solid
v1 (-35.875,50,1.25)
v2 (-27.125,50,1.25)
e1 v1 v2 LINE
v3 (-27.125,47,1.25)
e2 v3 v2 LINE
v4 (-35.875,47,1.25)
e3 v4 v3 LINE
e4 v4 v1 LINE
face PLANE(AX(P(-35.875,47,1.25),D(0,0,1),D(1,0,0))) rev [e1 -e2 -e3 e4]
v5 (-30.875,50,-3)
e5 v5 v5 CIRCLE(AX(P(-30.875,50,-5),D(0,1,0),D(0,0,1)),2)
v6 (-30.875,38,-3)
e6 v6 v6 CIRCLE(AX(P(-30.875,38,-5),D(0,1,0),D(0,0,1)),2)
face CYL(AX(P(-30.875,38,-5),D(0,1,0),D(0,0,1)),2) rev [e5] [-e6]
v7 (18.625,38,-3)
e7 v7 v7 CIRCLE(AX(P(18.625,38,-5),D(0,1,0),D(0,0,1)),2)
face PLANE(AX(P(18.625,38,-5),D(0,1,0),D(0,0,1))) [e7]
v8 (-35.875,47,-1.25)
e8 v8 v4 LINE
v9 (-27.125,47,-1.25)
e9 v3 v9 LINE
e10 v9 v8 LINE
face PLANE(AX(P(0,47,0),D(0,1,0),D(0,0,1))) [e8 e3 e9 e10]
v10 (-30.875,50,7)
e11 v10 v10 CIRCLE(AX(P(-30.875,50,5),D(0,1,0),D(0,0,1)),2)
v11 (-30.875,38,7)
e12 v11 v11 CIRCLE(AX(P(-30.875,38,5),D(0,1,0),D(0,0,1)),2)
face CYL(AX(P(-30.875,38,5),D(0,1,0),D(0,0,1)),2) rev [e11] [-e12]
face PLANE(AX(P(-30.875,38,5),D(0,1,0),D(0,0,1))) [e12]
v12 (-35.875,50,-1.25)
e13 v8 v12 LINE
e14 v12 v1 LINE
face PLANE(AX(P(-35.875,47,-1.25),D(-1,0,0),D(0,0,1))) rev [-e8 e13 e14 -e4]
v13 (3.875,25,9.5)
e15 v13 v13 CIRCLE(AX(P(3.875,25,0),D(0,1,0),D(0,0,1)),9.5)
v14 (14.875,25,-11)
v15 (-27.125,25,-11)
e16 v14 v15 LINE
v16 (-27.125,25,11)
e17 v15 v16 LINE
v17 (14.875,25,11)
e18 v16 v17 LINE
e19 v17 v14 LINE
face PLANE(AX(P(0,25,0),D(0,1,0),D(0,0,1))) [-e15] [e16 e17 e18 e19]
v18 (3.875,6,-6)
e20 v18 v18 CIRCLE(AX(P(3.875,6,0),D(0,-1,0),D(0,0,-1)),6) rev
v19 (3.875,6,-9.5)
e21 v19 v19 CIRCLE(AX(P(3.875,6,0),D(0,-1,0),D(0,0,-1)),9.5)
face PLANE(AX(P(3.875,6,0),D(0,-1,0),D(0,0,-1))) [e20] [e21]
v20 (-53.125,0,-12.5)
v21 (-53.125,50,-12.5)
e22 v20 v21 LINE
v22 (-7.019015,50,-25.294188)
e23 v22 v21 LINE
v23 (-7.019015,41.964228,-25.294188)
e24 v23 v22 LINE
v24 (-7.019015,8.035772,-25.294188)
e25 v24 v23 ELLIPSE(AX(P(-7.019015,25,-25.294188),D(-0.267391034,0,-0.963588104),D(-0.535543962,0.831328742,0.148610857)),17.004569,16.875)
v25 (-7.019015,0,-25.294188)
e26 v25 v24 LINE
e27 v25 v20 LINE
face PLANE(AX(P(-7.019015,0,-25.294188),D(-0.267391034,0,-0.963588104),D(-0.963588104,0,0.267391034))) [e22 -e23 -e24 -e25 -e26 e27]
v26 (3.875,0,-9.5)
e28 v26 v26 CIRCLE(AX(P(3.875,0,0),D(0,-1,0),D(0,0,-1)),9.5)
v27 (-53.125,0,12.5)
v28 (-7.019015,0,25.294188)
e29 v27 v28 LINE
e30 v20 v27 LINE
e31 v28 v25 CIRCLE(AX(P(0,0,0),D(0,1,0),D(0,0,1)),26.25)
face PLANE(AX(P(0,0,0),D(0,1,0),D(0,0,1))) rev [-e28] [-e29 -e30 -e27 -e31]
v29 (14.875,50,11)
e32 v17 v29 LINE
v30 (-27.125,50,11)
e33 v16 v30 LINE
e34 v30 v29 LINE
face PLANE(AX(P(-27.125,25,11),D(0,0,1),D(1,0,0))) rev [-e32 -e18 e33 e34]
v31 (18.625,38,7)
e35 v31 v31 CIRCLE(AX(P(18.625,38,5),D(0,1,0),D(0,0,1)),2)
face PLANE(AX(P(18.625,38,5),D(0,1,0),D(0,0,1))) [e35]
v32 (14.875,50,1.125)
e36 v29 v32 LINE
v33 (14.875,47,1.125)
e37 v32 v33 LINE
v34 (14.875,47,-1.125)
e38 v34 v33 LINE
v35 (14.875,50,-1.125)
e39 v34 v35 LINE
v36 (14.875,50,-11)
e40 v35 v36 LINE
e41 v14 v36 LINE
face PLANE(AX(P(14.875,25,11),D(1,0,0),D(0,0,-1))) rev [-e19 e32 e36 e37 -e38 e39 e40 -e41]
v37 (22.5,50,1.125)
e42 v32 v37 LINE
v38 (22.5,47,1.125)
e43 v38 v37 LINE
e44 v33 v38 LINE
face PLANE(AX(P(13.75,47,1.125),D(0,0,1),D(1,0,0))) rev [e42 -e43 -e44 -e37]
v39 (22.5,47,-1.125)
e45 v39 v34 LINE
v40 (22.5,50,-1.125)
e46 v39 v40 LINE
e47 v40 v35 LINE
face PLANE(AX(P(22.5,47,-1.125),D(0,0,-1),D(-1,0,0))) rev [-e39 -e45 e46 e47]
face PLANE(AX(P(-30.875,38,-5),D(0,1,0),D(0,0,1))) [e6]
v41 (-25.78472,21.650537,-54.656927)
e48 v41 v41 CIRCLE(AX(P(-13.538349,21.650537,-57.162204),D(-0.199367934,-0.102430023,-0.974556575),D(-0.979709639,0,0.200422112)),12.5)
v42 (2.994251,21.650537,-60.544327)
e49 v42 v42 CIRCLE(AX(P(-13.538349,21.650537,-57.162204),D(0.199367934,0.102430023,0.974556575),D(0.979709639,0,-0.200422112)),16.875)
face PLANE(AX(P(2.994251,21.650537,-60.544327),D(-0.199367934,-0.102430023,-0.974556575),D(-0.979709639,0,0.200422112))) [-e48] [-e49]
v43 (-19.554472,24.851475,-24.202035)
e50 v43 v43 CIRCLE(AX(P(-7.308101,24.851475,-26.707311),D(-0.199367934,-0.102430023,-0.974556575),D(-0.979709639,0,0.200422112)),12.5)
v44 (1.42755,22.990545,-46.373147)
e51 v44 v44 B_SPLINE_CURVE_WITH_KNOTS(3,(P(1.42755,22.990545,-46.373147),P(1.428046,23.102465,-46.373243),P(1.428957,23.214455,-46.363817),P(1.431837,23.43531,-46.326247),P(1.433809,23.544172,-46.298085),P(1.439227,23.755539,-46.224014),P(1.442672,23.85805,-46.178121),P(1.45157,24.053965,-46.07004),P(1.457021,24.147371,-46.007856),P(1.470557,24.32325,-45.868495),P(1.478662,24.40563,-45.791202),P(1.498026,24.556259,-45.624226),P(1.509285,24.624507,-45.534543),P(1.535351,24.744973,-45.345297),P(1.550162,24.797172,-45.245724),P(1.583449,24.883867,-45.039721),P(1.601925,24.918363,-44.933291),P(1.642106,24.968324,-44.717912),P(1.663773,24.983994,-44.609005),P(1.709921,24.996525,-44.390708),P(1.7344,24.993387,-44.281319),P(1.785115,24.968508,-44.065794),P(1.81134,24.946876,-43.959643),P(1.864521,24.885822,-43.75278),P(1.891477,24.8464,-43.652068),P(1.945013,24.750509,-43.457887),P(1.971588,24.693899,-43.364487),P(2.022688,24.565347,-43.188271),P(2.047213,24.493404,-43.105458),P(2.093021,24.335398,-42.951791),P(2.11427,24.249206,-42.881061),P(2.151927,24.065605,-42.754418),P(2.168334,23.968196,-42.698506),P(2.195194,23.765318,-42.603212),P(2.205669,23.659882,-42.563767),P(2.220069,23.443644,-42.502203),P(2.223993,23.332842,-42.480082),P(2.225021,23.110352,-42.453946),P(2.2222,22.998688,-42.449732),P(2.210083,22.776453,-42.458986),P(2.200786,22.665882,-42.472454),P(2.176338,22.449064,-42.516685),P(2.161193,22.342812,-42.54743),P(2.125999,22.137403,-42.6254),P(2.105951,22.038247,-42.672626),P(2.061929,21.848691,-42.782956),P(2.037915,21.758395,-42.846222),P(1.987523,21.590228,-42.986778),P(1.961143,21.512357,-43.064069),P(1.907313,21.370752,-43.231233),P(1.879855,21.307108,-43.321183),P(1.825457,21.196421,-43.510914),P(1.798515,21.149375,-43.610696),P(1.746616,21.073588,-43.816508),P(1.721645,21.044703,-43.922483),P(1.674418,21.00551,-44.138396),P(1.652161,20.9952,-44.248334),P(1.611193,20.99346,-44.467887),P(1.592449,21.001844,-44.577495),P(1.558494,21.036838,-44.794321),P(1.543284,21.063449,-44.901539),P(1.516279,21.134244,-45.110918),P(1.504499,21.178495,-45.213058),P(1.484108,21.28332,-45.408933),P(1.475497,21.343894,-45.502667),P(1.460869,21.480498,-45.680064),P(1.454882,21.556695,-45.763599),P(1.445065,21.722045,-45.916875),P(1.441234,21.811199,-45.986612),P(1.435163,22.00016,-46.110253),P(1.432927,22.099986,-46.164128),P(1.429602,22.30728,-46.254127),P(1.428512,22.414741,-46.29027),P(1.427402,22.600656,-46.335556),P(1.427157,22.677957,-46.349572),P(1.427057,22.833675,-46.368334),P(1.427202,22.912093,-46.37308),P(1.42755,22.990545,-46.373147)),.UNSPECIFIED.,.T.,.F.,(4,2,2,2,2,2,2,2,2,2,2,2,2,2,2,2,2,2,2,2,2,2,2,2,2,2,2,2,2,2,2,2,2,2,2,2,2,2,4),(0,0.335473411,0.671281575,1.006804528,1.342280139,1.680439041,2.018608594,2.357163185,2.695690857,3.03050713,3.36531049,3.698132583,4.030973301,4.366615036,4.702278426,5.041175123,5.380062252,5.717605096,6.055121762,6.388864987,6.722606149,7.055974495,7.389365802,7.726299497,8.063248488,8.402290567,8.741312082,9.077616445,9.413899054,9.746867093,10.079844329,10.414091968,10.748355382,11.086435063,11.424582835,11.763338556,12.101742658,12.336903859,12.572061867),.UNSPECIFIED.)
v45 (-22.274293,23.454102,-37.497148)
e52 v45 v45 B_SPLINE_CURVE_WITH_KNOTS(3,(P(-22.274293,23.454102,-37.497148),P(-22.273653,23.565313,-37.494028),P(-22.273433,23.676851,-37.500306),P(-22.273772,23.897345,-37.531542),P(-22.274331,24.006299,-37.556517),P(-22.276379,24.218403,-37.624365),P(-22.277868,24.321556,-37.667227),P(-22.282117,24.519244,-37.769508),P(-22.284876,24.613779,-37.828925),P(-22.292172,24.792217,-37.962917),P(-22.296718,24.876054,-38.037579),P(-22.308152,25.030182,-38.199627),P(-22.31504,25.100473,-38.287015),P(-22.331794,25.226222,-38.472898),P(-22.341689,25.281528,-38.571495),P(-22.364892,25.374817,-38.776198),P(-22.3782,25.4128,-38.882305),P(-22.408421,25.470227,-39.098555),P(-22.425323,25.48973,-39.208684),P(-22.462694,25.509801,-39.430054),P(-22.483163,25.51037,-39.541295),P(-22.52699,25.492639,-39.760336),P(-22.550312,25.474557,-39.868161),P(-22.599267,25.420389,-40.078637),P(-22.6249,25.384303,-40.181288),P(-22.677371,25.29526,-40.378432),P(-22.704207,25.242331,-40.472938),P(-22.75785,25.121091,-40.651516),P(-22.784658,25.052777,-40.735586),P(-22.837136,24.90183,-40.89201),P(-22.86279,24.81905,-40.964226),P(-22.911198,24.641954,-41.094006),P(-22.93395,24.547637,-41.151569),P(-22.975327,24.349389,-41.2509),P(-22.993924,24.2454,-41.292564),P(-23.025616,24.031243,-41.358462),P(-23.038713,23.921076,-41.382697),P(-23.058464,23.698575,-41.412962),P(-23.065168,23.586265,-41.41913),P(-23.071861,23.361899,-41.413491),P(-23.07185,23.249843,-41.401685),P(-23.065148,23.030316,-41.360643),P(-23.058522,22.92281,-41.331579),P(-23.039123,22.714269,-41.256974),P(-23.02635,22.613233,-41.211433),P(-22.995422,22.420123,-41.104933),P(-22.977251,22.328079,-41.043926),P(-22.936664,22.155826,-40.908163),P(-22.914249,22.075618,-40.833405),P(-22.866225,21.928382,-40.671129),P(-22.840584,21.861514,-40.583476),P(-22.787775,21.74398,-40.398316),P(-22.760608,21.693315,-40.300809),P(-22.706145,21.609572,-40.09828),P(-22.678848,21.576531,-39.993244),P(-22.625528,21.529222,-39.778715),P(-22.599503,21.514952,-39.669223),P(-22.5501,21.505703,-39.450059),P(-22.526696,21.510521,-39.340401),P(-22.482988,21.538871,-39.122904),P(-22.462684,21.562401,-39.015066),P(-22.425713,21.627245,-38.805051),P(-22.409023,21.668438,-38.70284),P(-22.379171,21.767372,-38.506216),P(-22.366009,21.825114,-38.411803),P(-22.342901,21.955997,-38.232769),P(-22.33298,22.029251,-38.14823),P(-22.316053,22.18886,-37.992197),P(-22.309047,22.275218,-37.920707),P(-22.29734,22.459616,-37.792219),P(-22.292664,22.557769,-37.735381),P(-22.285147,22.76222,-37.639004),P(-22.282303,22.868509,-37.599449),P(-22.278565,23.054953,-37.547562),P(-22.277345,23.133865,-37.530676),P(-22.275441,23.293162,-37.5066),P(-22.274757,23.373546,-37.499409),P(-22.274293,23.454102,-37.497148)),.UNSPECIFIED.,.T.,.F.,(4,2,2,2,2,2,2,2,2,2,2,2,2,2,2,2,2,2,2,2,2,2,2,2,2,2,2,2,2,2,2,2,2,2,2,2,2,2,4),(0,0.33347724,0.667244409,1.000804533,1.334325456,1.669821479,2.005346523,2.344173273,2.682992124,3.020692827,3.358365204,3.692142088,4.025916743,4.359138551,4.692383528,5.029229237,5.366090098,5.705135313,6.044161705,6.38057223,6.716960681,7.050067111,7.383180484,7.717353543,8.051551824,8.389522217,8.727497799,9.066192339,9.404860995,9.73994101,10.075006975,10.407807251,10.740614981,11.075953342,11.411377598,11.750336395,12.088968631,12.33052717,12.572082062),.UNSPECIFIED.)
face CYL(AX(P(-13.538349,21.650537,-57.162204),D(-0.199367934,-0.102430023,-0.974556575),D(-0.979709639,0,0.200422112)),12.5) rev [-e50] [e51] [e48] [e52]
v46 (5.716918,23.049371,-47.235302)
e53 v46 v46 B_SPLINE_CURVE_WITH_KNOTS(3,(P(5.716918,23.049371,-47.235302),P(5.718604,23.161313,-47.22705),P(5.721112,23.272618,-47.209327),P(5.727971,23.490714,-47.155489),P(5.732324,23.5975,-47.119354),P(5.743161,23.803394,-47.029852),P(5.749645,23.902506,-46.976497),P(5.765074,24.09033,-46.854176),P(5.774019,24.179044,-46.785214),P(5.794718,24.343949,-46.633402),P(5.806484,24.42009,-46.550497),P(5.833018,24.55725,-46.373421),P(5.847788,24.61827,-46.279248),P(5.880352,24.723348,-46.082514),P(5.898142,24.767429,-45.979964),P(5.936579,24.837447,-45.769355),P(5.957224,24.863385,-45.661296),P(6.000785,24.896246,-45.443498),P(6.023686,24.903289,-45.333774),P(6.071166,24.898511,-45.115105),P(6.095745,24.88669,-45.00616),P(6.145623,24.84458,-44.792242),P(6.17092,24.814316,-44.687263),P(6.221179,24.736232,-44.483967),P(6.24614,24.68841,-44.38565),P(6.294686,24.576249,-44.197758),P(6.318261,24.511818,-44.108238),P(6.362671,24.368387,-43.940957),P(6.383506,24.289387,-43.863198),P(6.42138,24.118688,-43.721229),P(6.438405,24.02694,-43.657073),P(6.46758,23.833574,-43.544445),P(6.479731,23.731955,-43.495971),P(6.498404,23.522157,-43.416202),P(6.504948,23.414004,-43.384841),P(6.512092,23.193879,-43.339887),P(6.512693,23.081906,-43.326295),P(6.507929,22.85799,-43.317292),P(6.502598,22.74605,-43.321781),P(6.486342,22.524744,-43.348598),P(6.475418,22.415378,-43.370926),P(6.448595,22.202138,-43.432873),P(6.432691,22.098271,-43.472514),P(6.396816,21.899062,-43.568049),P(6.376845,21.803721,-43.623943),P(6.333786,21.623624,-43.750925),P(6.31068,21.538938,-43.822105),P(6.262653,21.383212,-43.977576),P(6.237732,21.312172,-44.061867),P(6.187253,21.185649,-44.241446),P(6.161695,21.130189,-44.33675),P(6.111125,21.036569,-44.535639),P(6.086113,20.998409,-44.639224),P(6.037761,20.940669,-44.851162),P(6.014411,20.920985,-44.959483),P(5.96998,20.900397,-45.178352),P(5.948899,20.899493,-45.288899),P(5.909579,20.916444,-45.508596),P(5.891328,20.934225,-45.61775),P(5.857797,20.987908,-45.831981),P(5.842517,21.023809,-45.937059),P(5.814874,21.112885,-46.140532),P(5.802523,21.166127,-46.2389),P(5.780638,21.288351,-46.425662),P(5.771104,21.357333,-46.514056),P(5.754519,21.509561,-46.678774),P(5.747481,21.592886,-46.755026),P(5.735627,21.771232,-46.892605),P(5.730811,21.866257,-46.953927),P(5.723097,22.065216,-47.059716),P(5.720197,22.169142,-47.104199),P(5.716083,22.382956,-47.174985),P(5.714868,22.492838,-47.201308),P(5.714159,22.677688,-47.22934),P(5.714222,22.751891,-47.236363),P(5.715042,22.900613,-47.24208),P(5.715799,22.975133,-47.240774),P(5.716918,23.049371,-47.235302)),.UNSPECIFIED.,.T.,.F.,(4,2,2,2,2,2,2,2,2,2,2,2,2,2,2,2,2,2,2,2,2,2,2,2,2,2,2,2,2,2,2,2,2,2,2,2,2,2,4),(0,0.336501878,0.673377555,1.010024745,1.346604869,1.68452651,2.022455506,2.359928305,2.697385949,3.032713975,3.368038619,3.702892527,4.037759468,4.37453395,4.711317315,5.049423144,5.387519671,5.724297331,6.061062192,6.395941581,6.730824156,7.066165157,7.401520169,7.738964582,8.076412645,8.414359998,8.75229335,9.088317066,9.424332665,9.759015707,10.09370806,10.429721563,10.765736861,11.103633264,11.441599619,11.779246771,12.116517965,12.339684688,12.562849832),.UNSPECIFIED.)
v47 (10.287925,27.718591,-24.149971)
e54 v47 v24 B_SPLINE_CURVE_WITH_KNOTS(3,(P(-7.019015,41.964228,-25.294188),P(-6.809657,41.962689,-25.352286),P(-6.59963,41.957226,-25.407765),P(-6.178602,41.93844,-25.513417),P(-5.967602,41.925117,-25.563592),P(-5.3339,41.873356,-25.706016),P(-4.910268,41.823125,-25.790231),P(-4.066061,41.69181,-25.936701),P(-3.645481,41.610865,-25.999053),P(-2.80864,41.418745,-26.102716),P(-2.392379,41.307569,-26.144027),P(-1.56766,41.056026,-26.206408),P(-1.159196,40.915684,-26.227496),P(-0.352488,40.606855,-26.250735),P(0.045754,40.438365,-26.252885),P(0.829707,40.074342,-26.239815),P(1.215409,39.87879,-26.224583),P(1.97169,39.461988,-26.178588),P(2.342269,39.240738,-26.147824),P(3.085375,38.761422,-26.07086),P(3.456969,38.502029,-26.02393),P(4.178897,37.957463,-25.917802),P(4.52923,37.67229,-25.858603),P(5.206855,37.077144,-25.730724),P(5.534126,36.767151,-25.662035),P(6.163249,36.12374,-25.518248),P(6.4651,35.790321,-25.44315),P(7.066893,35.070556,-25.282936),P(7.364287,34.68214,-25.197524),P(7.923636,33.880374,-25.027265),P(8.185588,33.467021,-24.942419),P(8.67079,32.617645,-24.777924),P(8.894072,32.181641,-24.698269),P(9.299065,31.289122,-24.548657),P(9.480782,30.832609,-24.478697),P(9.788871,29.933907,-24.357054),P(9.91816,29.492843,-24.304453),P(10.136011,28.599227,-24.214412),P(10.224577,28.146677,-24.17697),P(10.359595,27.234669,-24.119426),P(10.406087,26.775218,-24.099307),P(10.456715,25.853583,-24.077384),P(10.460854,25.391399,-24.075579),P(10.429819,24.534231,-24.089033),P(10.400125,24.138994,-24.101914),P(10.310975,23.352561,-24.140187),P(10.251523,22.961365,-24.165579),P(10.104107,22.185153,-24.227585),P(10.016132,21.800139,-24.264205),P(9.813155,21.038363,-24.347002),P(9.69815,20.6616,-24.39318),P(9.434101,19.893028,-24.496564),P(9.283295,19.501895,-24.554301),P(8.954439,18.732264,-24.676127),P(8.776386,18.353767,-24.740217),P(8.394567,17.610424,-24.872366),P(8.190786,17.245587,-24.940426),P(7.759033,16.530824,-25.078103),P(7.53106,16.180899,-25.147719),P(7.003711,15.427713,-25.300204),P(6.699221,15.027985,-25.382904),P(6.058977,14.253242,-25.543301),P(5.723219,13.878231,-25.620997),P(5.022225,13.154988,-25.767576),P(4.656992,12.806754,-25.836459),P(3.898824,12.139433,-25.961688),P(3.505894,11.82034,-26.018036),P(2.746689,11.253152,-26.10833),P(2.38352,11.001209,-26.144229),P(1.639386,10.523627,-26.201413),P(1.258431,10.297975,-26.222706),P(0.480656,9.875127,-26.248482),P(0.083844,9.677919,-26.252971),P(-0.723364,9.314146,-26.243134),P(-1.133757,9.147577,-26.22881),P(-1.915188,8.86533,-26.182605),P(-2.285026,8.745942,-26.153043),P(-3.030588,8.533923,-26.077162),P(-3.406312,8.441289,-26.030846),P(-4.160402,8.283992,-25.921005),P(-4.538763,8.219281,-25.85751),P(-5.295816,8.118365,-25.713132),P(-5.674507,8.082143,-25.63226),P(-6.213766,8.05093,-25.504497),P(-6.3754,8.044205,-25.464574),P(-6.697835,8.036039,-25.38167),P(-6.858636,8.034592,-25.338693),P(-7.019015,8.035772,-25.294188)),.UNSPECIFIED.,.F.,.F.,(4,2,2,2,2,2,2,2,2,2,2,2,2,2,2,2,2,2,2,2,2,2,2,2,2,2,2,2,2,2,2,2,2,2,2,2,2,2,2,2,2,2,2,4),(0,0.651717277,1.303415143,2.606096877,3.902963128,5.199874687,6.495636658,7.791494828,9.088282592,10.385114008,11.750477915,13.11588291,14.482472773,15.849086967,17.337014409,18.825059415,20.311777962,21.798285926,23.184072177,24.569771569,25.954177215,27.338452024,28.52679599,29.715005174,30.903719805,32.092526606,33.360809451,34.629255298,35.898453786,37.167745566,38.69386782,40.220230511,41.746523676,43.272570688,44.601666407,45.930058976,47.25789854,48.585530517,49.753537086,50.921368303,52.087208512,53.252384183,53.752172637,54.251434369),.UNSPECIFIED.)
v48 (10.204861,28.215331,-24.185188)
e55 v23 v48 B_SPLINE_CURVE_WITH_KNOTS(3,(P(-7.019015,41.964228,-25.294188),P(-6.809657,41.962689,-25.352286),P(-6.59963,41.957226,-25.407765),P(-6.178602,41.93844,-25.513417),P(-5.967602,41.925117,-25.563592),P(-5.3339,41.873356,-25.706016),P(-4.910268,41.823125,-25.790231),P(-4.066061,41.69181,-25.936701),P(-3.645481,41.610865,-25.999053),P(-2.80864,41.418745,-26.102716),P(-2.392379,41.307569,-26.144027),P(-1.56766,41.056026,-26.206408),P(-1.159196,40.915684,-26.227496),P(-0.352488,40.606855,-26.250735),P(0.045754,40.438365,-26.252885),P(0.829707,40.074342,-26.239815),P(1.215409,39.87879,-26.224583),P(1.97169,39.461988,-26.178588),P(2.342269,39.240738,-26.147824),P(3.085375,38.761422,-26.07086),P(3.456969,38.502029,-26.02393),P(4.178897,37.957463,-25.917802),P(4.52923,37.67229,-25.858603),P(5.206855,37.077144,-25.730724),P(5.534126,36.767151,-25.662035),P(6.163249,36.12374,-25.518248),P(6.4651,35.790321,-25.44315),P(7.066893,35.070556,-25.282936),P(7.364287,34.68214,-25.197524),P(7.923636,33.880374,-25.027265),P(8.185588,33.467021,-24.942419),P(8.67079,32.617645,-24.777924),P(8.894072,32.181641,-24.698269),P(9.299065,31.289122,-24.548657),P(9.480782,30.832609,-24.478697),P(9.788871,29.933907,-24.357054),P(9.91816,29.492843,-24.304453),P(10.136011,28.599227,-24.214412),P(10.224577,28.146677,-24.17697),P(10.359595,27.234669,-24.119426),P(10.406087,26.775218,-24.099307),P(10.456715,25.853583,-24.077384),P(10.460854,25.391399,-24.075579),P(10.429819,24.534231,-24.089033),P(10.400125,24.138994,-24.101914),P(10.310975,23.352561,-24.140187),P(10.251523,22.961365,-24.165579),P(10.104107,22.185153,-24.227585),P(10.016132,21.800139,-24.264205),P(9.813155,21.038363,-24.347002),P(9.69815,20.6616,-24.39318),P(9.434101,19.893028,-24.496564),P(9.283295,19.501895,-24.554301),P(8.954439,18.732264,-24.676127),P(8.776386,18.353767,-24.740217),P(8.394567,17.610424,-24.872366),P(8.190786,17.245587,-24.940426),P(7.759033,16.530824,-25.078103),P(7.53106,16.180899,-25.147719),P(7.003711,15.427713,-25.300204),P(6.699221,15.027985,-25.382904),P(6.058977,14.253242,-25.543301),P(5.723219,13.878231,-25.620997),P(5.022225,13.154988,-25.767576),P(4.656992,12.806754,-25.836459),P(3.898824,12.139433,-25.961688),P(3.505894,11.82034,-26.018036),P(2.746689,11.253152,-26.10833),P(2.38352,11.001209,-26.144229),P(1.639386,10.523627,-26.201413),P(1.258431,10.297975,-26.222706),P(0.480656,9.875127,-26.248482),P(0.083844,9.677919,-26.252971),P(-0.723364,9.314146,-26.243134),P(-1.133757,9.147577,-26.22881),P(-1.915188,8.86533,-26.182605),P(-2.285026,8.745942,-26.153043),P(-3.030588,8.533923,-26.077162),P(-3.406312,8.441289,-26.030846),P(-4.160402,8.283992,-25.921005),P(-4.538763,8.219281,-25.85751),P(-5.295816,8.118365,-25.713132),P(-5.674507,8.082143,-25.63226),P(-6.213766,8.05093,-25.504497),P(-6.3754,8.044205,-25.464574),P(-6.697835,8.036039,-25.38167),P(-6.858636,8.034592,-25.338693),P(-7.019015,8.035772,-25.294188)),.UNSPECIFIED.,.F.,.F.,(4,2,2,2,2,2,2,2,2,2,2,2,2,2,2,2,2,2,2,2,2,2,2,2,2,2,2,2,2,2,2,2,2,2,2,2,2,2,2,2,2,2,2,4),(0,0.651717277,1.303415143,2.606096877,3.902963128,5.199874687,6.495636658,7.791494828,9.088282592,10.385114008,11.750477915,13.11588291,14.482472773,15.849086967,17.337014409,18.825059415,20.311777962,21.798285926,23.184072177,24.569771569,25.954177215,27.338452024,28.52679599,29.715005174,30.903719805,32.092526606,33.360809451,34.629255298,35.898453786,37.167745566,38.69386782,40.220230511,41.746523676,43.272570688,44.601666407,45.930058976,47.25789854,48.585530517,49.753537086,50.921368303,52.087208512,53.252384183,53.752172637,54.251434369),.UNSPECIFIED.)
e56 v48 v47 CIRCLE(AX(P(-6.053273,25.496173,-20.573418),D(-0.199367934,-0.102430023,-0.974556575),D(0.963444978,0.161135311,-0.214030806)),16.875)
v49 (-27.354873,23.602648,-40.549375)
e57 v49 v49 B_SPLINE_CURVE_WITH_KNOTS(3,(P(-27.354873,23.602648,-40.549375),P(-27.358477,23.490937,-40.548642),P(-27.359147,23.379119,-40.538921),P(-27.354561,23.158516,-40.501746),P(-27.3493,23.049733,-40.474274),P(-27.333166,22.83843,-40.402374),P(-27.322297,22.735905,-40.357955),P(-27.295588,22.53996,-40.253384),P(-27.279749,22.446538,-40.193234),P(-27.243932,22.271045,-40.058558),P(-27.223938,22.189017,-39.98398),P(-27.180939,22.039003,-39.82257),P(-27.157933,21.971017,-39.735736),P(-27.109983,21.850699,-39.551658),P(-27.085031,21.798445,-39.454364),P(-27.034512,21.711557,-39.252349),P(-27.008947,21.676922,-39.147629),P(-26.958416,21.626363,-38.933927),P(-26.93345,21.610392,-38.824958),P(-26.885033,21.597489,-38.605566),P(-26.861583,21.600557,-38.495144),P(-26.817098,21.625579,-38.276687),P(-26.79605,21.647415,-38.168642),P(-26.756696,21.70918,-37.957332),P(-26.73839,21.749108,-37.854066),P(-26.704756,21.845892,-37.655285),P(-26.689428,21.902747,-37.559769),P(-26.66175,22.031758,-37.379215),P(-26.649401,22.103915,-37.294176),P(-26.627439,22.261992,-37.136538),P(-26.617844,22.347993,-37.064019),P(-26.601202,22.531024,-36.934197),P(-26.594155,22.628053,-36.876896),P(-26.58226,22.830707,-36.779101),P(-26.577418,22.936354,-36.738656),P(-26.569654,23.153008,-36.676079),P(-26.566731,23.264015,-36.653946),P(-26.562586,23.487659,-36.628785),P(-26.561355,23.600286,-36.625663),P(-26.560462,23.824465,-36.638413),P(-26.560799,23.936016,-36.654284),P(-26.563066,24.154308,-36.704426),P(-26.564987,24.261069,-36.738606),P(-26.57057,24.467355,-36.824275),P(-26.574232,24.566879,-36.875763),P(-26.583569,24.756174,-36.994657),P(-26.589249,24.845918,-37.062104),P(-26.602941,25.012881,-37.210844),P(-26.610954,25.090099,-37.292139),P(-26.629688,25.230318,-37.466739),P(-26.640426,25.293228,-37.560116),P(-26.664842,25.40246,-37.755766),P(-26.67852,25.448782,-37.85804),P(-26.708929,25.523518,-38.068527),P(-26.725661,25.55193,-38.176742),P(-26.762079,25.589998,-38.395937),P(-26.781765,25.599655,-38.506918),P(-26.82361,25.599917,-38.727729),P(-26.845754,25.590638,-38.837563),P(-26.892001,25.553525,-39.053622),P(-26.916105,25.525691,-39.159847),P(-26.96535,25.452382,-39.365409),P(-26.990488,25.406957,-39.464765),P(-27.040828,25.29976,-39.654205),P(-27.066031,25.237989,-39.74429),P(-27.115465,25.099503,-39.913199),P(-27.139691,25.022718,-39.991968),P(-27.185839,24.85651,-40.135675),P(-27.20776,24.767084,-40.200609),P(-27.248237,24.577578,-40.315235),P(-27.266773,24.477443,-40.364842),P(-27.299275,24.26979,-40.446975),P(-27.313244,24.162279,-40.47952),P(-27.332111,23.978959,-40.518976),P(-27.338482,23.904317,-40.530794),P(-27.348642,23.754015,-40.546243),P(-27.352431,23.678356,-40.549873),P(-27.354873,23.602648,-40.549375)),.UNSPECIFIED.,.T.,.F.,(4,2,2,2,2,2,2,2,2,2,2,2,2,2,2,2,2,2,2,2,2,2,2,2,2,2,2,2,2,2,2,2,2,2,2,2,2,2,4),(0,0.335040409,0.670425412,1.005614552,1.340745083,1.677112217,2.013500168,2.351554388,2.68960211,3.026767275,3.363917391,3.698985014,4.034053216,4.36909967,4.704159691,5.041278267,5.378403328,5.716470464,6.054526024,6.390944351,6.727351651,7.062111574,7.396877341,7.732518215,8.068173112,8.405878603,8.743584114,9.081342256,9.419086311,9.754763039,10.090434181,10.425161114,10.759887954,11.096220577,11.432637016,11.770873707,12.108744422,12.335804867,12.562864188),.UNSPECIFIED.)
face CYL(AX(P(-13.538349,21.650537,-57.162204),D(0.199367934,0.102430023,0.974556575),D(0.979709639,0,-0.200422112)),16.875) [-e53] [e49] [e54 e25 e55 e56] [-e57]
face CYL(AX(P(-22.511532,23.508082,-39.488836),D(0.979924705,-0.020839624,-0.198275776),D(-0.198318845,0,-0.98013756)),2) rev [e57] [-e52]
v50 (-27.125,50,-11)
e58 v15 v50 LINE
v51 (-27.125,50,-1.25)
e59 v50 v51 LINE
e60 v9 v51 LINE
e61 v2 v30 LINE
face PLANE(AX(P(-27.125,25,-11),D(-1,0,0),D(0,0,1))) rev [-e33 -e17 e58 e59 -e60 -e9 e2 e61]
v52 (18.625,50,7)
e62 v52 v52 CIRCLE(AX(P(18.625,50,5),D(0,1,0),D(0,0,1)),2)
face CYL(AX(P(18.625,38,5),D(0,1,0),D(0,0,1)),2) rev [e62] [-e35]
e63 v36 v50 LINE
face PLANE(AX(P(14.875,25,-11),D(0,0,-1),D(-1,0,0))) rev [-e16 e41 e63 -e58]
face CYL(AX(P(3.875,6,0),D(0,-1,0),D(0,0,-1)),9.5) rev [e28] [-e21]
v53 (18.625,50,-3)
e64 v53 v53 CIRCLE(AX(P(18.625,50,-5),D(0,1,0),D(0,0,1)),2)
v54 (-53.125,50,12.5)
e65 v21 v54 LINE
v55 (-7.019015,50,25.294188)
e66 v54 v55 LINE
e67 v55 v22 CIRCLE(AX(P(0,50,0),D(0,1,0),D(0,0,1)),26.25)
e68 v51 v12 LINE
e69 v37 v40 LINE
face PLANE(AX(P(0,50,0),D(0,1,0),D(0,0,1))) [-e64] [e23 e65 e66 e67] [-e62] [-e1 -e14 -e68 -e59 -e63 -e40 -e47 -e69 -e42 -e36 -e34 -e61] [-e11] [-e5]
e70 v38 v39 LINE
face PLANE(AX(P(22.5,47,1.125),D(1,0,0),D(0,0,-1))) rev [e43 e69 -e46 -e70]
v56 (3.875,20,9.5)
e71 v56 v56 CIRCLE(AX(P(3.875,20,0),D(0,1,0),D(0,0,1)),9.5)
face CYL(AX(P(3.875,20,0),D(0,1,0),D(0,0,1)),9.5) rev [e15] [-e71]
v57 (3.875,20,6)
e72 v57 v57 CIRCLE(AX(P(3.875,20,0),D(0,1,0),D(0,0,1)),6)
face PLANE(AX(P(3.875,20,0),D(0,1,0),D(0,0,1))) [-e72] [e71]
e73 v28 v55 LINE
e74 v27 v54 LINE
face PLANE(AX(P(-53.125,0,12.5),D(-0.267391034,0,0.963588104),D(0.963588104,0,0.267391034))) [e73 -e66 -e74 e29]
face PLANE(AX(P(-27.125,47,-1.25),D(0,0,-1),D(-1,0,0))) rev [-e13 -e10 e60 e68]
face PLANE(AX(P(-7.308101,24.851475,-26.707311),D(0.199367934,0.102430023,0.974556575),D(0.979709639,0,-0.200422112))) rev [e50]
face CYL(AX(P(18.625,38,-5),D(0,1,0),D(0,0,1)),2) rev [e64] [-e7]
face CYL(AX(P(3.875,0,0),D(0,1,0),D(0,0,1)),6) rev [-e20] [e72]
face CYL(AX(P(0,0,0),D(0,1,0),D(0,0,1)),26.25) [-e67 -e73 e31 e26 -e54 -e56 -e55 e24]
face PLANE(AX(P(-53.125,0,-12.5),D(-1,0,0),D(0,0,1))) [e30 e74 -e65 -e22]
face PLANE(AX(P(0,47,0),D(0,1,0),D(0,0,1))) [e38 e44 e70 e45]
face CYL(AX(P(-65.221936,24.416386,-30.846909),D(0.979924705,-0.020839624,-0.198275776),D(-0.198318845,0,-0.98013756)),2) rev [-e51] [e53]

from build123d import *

# Parameters (mm, degrees)
BOSS_EXTRUDE1_DEPTH       = 40
SKETCH2_W                 = 33.6
SKETCH2_H                 = 17.6
CUT_EXTRUDE1_DEPTH        = 20
SKETCH3_W                 = 7
SKETCH3_H                 = 2
CUT_EXTRUDE2_DEPTH        = 2.4
SKETCH4_W                 = 7
SKETCH4_H                 = 1.8
CUT_EXTRUDE3_DEPTH        = 2.4
REVOLVE1_START            = -44.95139953
REVOLVE1_OUTLINE_R        = 13.5
REVOLVE1_DEPTH            = 30.829897511
M18_CLEARANCE_HOLE1_D     = 20
M18_CLEARANCE_HOLE1_DEPTH = 25
SKETCH9_W                 = 1.6
SKETCH9_H                 = 27
CUT_EXTRUDE4_DEPTH        = 76.299241718
CUT_EXTRUDE4_DEPTH_BACK   = 76.299241718
SKETCH18_R                = 1.6
SCALE2_SCALE              = 1.25
SKETCH20_R                = 9.5
CUT_EXTRUDE5_DEPTH        = 5
SKETCH21_R                = 6
CUT_EXTRUDE6_DEPTH        = 87.235197147
CUT_EXTRUDE8_START        = -6
SKETCH25_R                = 9.5
CUT_EXTRUDE8_DEPTH        = 6
SKETCH27_R                = 2
CUT_EXTRUDE9_DEPTH        = 12


with BuildPart() as part:
    # Sketch1 → Boss-Extrude1 (new body)
    with BuildSketch(Plane(origin=(0, 40, 0), x_dir=(1, 0, 0), z_dir=(0, 1, 0))):
        with BuildLine():
            Line((-5.61521172, 20.235350191), (-42.5, 10))
            Line((-42.5, 10), (-42.5, -10))
            Line((-42.5, -10), (-5.61521172, -20.235350191))
            ThreePointArc((-5.61521172, -20.235350191), (21, 0), (-5.61521172, 20.235350191))
        make_face()
    extrude(amount=-BOSS_EXTRUDE1_DEPTH)

    # Sketch2 → Cut-Extrude1 (cut)
    with BuildSketch(Plane(origin=(0, 40, 0), x_dir=(-1, 0, 0), z_dir=(0, 1, 0))):
        with Locations((4.9, 0)):
            Rectangle(SKETCH2_W, SKETCH2_H)
    extrude(amount=-CUT_EXTRUDE1_DEPTH, mode=Mode.SUBTRACT)

    # Sketch3 → Cut-Extrude2 (cut)
    with BuildSketch(Plane(origin=(0, 40, 0), x_dir=(-1, 0, 0), z_dir=(0, 1, 0))):
        with Locations((25.2, 0)):
            Rectangle(SKETCH3_W, SKETCH3_H)
    extrude(amount=-CUT_EXTRUDE2_DEPTH, mode=Mode.SUBTRACT)

    # Sketch4 → Cut-Extrude3 (cut)
    with BuildSketch(Plane(origin=(0, 40, 0), x_dir=(-1, 0, 0), z_dir=(0, 1, 0))):
        with Locations((-14.5, 0)):
            Rectangle(SKETCH4_W, SKETCH4_H)
    extrude(amount=-CUT_EXTRUDE3_DEPTH, mode=Mode.SUBTRACT)

    # Revolve1: read off the stored shape, not the designer's step
    # Revolve1 outline → Revolve1 (add)
    with BuildSketch(Plane(origin=(0, 0, 0), x_dir=(0.9799247046208294, -0.02083962380947531, -0.19827577601224947), z_dir=(0.19936793441719802, 0.10243002349202102, 0.9745565745577031)).offset(REVOLVE1_START)):
        with Locations((-1.9070974, 22.005607966)):
            Circle(REVOLVE1_OUTLINE_R)
    extrude(amount=REVOLVE1_DEPTH)

    # M18 Clearance Hole1
    with Locations(Plane(origin=(-8.961867673, -4.60437291, -43.807681948), x_dir=(-0.9799247046208296, 0.02083962380947534, 0.19827577601224922), z_dir=(-0.19936793441719777, -0.10243002349202121, -0.9745565745577032))):
        with Locations((1.9070974, 22.005607966)):
            Hole(M18_CLEARANCE_HOLE1_D / 2, depth=M18_CLEARANCE_HOLE1_DEPTH)

    # Sketch9 → M3.5 Clearance Hole1 (revolve, cut)
    with BuildSketch(Plane(origin=(-18.009225855, 18.806465846, -31.591069121), x_dir=(-0.12392681772022805, 0.7153744254872676, -0.6876638533531477), z_dir=(0.1561720753640579, 0.6984304843277114, 0.6984304843277114))):
        with Locations((0.8, 13.5)):
            Rectangle(SKETCH9_W, SKETCH9_H)
    revolve(axis=Axis((-11.78670398, 18.674134235, -32.850120299), (-0.9799247046208297, 0.020839623809475325, 0.19827577601224802)), mode=Mode.SUBTRACT)

    # Sketch18 → Cut-Extrude4 (cut, two sides: drawn at the far end of the back side and taken through both)
    with BuildSketch(Plane(origin=(-1.740210315, 0.03700828, 0.352110268), x_dir=(-0.19823095447813932, 0.004215689735382395, -0.9801462730872066), z_dir=(0.9799247046208297, -0.020839623809475356, -0.19827577601224802)).offset(-CUT_EXTRUDE4_DEPTH_BACK)):
        with Locations(Location((34.613136918, 18.419306886, 0), (0, 0, 359.758405588))):
            Circle(SKETCH18_R)
    extrude(amount=CUT_EXTRUDE4_DEPTH + CUT_EXTRUDE4_DEPTH_BACK, mode=Mode.SUBTRACT)


with BuildPart() as part_1:
    # Scale2: scaled about (0, 0, 0)
    add(part.part.scale(SCALE2_SCALE))

    # Sketch20 → Cut-Extrude5 (cut)
    with BuildSketch(Plane(origin=(0, 25, 0), x_dir=(1, 0, 0), z_dir=(0, 1, 0))):
        with Locations(Location((3.875, 0, 0), (0, 0, 270))):
            Circle(SKETCH20_R)
    extrude(amount=-CUT_EXTRUDE5_DEPTH, mode=Mode.SUBTRACT)

    # Sketch21 → Cut-Extrude6 (cut, through all)
    with BuildSketch(Plane(origin=(0, 20, 0), x_dir=(1, 0, 0), z_dir=(0, 1, 0))):
        with Locations(Location((3.875, 0, 0), (0, 0, 270))):
            Circle(SKETCH21_R)
    extrude(amount=-CUT_EXTRUDE6_DEPTH, mode=Mode.SUBTRACT)

    # Sketch25 → Cut-Extrude8 (cut)
    with BuildSketch(Plane.XZ.offset(CUT_EXTRUDE8_START)):
        with Locations(Location((3.875, 0, 0), (0, 0, 90))):
            Circle(SKETCH25_R)
    extrude(amount=CUT_EXTRUDE8_DEPTH, mode=Mode.SUBTRACT)

    # Sketch27 → Cut-Extrude9 (cut)
    with BuildSketch(Plane(origin=(0, 50, 0), x_dir=(1, 0, 0), z_dir=(0, 1, 0))):
        with Locations(Location((18.625, 5, 0), (0, 0, 270))):
            Circle(SKETCH27_R)
        with Locations(Location((18.625, -5, 0), (0, 0, 270))):
            Circle(SKETCH27_R)
        with Locations(Location((-30.875, 5, 0), (0, 0, 270))):
            Circle(SKETCH27_R)
        with Locations(Location((-30.875, -5, 0), (0, 0, 270))):
            Circle(SKETCH27_R)
    extrude(amount=-CUT_EXTRUDE9_DEPTH, mode=Mode.SUBTRACT)


solid = part_1.part
